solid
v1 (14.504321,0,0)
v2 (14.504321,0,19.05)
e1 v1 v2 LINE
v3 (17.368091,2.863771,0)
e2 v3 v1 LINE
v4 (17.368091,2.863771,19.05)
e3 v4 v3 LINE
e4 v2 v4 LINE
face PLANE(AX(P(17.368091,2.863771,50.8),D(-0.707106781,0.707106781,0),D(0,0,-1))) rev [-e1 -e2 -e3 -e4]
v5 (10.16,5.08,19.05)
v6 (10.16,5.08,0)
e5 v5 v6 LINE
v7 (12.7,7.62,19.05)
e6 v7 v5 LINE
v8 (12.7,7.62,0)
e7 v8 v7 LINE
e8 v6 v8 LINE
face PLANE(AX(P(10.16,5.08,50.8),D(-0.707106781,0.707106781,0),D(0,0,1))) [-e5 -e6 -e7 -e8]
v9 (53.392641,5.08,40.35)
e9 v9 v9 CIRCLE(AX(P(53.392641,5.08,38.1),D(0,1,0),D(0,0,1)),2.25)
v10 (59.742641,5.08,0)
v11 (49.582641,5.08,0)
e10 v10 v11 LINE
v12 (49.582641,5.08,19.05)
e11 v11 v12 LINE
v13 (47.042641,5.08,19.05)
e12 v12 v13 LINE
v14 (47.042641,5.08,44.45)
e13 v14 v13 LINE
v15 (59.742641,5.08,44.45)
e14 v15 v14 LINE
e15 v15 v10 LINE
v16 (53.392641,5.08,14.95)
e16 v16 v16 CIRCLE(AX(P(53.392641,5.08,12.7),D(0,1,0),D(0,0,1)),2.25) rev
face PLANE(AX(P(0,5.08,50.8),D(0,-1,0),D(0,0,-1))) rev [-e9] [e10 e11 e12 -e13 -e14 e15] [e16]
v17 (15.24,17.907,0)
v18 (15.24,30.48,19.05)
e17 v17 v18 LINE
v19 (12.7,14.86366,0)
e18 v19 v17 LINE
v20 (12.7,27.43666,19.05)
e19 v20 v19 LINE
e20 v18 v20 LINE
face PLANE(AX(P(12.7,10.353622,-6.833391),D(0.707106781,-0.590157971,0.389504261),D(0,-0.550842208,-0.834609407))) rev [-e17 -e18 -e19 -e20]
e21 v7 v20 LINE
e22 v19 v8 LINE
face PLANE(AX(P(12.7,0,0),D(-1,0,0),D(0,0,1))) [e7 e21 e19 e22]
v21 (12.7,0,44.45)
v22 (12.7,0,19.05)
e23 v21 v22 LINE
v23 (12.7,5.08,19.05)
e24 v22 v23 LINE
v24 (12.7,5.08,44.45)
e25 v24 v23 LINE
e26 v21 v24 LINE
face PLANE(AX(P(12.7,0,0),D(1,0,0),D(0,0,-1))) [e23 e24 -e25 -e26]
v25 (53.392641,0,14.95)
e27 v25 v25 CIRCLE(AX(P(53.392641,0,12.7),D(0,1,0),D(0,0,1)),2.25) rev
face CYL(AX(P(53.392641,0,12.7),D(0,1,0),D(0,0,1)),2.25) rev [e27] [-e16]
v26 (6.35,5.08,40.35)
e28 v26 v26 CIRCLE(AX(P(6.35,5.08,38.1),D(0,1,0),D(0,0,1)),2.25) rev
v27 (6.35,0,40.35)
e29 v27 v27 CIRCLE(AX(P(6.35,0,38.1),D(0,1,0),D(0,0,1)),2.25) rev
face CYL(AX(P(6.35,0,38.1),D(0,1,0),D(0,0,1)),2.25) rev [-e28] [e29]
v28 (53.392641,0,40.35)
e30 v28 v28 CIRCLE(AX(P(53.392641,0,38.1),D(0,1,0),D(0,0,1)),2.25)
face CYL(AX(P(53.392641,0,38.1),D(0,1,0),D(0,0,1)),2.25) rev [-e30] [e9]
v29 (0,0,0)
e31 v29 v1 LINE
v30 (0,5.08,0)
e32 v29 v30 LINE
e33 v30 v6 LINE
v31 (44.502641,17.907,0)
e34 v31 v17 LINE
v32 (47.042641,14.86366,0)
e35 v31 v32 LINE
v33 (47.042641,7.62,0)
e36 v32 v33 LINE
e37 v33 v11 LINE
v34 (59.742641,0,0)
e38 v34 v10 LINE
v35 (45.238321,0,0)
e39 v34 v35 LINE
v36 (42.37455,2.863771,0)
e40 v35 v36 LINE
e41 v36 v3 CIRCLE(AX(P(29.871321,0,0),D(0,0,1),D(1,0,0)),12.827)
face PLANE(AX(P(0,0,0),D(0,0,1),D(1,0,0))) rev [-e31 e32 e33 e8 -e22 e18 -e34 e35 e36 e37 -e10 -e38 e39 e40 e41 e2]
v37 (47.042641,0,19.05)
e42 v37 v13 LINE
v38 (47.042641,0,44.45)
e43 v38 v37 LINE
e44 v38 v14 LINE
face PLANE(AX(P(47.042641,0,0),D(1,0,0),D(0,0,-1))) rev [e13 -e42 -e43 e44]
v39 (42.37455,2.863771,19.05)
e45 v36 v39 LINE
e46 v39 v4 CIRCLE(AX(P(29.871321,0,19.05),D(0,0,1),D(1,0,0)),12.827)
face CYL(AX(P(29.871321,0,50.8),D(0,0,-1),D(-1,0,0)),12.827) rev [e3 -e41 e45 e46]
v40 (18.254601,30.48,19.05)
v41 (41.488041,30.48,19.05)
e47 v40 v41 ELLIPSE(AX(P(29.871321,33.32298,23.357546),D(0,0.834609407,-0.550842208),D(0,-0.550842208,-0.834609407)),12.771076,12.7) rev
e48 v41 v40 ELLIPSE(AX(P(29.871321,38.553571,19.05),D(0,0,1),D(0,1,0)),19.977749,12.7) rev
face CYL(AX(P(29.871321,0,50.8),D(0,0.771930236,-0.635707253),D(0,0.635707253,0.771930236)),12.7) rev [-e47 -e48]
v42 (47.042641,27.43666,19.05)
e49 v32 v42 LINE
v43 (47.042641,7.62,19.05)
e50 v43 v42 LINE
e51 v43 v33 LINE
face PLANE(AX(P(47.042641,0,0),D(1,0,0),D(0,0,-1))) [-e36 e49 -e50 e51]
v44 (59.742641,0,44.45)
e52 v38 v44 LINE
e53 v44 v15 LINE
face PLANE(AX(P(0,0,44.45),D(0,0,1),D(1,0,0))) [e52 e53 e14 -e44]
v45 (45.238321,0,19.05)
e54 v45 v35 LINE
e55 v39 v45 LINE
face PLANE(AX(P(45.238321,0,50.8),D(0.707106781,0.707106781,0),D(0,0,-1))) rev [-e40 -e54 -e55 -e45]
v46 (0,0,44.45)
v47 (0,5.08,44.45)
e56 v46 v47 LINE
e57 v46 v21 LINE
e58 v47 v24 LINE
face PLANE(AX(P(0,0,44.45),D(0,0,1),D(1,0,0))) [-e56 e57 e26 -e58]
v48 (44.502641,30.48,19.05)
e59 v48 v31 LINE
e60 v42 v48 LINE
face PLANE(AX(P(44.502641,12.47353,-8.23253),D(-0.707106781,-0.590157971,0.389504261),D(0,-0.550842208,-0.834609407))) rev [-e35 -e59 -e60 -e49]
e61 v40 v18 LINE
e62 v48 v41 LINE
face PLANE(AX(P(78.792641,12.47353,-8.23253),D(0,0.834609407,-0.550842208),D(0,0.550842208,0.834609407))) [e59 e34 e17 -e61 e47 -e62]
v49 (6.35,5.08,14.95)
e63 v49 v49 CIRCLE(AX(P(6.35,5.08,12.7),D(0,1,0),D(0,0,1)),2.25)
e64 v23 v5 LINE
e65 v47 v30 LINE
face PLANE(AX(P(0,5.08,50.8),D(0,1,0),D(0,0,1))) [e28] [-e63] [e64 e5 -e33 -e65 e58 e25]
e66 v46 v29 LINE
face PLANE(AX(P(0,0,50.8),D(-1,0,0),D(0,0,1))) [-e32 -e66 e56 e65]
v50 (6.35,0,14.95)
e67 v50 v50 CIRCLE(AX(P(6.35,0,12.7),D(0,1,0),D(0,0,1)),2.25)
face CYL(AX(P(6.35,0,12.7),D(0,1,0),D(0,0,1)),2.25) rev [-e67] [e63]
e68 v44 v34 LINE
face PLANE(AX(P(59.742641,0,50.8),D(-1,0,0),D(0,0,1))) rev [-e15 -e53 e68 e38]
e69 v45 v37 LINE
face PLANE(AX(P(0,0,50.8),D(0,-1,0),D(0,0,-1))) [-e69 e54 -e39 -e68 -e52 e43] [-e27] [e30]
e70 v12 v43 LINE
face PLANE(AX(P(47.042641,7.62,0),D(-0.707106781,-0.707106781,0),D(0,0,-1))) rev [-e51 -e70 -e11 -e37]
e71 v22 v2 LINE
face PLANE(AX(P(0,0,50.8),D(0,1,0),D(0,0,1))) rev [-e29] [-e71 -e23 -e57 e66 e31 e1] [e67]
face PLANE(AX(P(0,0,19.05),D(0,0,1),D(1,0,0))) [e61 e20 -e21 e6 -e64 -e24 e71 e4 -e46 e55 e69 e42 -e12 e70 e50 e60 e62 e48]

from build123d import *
from build123d.topology import SkipClean

# Parameters (mm, degrees)
BOSS_EXTRUDE1_DEPTH     = 50.8
SKETCH2_R               = 2.25
SKETCH2_R_2             = 2.2500000000000004
SKETCH2_R_3             = 2.2499999999999964
SKETCH2_R_4             = 2.250000000000002
CUT_EXTRUDE2_DEPTH      = 80.4629164554471
CUT_EXTRUDE4_DEPTH      = 80.4629164554471
CUT_EXTRUDE4_DEPTH_BACK = 80.4629164554471
SKETCH7_W               = 34.34264107490862
SKETCH7_H               = 6.349999999999994
SKETCH7_H_2             = 25.4
SKETCH7_W_2             = 12.699999999999996
BOSS_EXTRUDE3_START     = 12.7
BOSS_EXTRUDE3_DEPTH     = 34.342641075
CUT_EXTRUDE5_DEPTH      = 81.46127057538526
CUT_EXTRUDE5_DEPTH_BACK = 81.46127057538526
CAVITY1_START           = -12.110223167
CAVITY1_DEPTH           = 25.933177896
CHAMFER5_SIZE           = 2.54


with BuildPart() as part:
    # Sketch1 → Boss-Extrude1 (new body)
    with BuildSketch(Plane.XY):
        with BuildLine():
            Line((0, 5.08), (0, 0))
            Line((0, 0), (11.964320537454306, 0))
            ThreePointArc((11.964320537454306, 2.19e-15), (12.149194735731278, 2.56649684743677), (12.700000000000003, 5.080000000000005))
            Line((12.7, 5.08), (0, 5.08))
        make_face()
        with BuildLine():
            ThreePointArc((12.700000000000003, 5.080000000000005), (12.149194735731278, 2.56649684743677), (11.964320537454306, 2.19e-15))
            Line((11.964320537454306, 0), (17.044320537454304, 0))
            ThreePointArc((17.044320537454304, 1.57e-15), (20.80126185517433, 9.070058682279722), (29.871320537453954, 12.827000000000004))
            Line((29.871320537454306, 12.827000000000004), (29.871320537454306, 17.907))
            ThreePointArc((29.871320537454306, 17.907), (19.154672530731307, 14.34622265615587), (12.700000000000003, 5.080000000000005))
        make_face()
        with BuildLine():
            Line((42.69832053745431, 0), (47.778320537454306, 0))
            ThreePointArc((47.778320537454306, 0), (47.59344633917733, 2.56649684743677), (47.042641074908616, 5.079999999999999))
            ThreePointArc((47.042641074908616, 5.079999999999999), (40.5879685441773, 14.34622265615587), (29.871320537454306, 17.907))
            Line((29.871320537454306, 17.907), (29.871320537454306, 12.827000000000004))
            ThreePointArc((29.871320537453954, 12.827000000000004), (38.94137921973403, 9.070058682279972), (42.69832053745431, 0))
        make_face()
        with BuildLine():
            ThreePointArc((47.042641074908616, 5.079999999999999), (47.59344633917733, 2.56649684743677), (47.778320537454306, 0))
            Line((47.778320537454306, 0), (59.74264107490861, 0))
            Line((59.74264107490861, 0), (59.74264107490861, 5.08))
            Line((59.74264107490861, 5.08), (47.042641074908616, 5.08))
        make_face()
    extrude(amount=BOSS_EXTRUDE1_DEPTH)

    # Sketch2 → Cut-Extrude2 (cut, through all)
    with BuildSketch(Plane(origin=(0, 5.08, 0), x_dir=(1, 0, 0), z_dir=(0, 1, 0))):
        with Locations(Location((6.349999999999999, -12.7, 0), (0, 0, 270))):
            Circle(SKETCH2_R)
        with Locations(Location((6.350000000000002, -38.10000000000001, 0), (0, 0, 270))):
            Circle(SKETCH2_R_2)
        with Locations(Location((53.392641074908624, -38.1, 0), (0, 0, 270))):
            Circle(SKETCH2_R_3)
        with Locations(Location((53.39264107490862, -12.699999999999994, 0), (0, 0, 270))):
            Circle(SKETCH2_R_4)
    extrude(amount=-CUT_EXTRUDE2_DEPTH, mode=Mode.SUBTRACT)

    # Sketch7 → Cut-Extrude4 (cut, two sides: drawn at the far end of the back side and taken through both)
    with BuildSketch(Plane(origin=(0, 5.08, 0), x_dir=(1, 0, 0), z_dir=(0, 1, 0)).offset(-CUT_EXTRUDE4_DEPTH_BACK)):
        Polygon((0, -50.8), (12.700000000000001, -50.8), (12.7, -44.449999999999996), (0, -44.449999999999996), align=None)
        with Locations((29.871320537454306, -47.62499999999999)):
            Rectangle(SKETCH7_W, SKETCH7_H)
        with Locations((29.871320537454306, -31.749999999999996)):
            Rectangle(SKETCH7_W, SKETCH7_H_2)
        with Locations((53.39264107490861, -47.62499999999999)):
            Rectangle(SKETCH7_W_2, SKETCH7_H)
    extrude(amount=CUT_EXTRUDE4_DEPTH + CUT_EXTRUDE4_DEPTH_BACK, mode=Mode.SUBTRACT)

    # Sketch8 → Boss-Extrude3 (add)
    with BuildSketch(Plane(origin=(0, 0, 0), x_dir=(0, 0, -1), z_dir=(1, 0, 0)).offset(BOSS_EXTRUDE3_START)):
        Polygon((-19.049999999999997, 5.0799999999999965), (-19.049999999999994, 30.479999999999997), (0, 17.907), (0, 5.079999999999999), align=None)
    extrude(amount=BOSS_EXTRUDE3_DEPTH)

    # Sketch1<4> → Cut-Extrude5 (cut, two sides: drawn at the far end of the back side and taken through both)
    with SkipClean():  # the faces are left unmerged after this step: merging them gives an invalid solid
        with BuildSketch(Plane.XY.offset(-CUT_EXTRUDE5_DEPTH_BACK)):
            with BuildLine():
                ThreePointArc((29.871320537453954, 12.827000000000004), (20.80126185517433, 9.070058682279722), (17.044320537454304, 1.57e-15))
                Line((17.044320537454304, 0), (29.871320537454306, 0))
                Line((29.871320537454306, 0), (29.871320537454306, 12.827000000000004))
            make_face()
            with BuildLine():
                Line((29.871320537454306, 0), (17.044320537454304, 0))
                ThreePointArc((17.044320537454304, 1.57e-15), (29.871320537454302, -12.827000000000004), (42.69832053745431, -3.14e-15))
                ThreePointArc((42.69832053745431, 0), (38.94137921973403, 9.070058682279972), (29.871320537453954, 12.827000000000004))
                Line((29.871320537454306, 12.827000000000004), (29.871320537454306, 0))
            make_face()
        extrude(amount=CUT_EXTRUDE5_DEPTH + CUT_EXTRUDE5_DEPTH_BACK, mode=Mode.SUBTRACT)

    # Cavity1: read off the stored shape, not the designer's step
    # Cavity1 outline → Cavity1 (cut)
    with SkipClean():  # the faces are left unmerged after this step: merging them gives an invalid solid
        with BuildSketch(Plane(origin=(0, 0, 0), x_dir=(1, 0, 0), z_dir=(0, 0.7719302356170498, -0.6357072528610997)).offset(CAVITY1_START)):
            with BuildLine():
                Line((42.335603858, -36), (41.488040544, -34.081628056))
                ThreePointArc((41.488040544, -34.081628056), (29.871320538, -26.514055969), (18.254600531, -34.081628056))
                Line((18.254600531, -34.081628056), (17.407037217, -36))
                Line((17.407037217, -36), (42.335603858, -36))
            make_face()
        extrude(amount=CAVITY1_DEPTH, mode=Mode.SUBTRACT)

    # Chamfer5
    # the kernel refuses this chamfer: 2.54 mm, written as the material it adds along each edge
    with BuildSketch(Plane(origin=(12.700000000000003, 5.080000000000004, 0), x_dir=(-1, -1.4e-15, 0), z_dir=(0, 0, 1))) as chamfer5_piece_1:
        Polygon((CHAMFER5_SIZE, 0), (0, -CHAMFER5_SIZE), (0, 0), align=None)
    extrude(amount=19.049999999999997)
    with BuildSketch(Plane(origin=(47.042641074908616, 5.08, 0), x_dir=(3.598031758927257e-11, 1.0, 0), z_dir=(0, 0, 1))) as chamfer5_piece_2:
        Polygon((CHAMFER5_SIZE, 0), (9.139001e-11, -CHAMFER5_SIZE), (0, 0), align=None)
    extrude(amount=19.049999999999997)
    # the kernel refuses this chamfer: 2.54 mm, written as the material it takes off along each edge
    with BuildSketch(Plane(origin=(42.69832053745431, -1.3e-16, -7.4053740903902145), x_dir=(1, 5e-17, 0), z_dir=(0, 0, 1))) as chamfer5_2_piece_1:
        with BuildLine():
            Line((CHAMFER5_SIZE, 0), (-0.3237705210766462, 2.863770521075717))
            ThreePointArc((-0.3237705210766462, 2.863770521075717), (-0.08576469637885246, 1.4808281256642715), (0, 0))
            Line((0, 0), (CHAMFER5_SIZE, 0))
        make_face()
    extrude(amount=33.860748180780426, mode=Mode.SUBTRACT)
    with BuildSketch(Plane(origin=(17.044320537454304, 7.9e-16, -7.405374090390225), x_dir=(0.11234172985080312, 0.9936696310817439, 0), z_dir=(0, 0, 1))) as chamfer5_2_piece_2:
        with BuildLine():
            Line((2.882014737592532, 1e-17), (-CHAMFER5_SIZE * 0.112341729851, CHAMFER5_SIZE * 0.993669631082))
            Line((-CHAMFER5_SIZE * 0.112341729851, CHAMFER5_SIZE * 0.993669631082), (0, 0))
            ThreePointArc((0, 0), (1.4810888916756169, 0.0811370190382275), (2.882014737592532, 1e-17))
        make_face()
    extrude(amount=33.86074818078045, mode=Mode.SUBTRACT)
    with BuildSketch(Plane(origin=(47.042641075000006, 34.07814250199304, 24.501731063625822), x_dir=(-1, 6.4e-16, -4.2e-16), z_dir=(0, -0.5508422083307387, -0.8346094065617252))) as chamfer5_2_piece_3:
        Polygon((CHAMFER5_SIZE, 0), (-1.96e-15, -CHAMFER5_SIZE), (0, 0), align=None)
    extrude(amount=35.889197859210064, mode=Mode.SUBTRACT)
    with BuildSketch(Plane(origin=(12.7, 34.07814250199304, 24.50173106362582), x_dir=(0, -0.8346094065617252, 0.5508422083307387), z_dir=(0, -0.5508422083307387, -0.8346094065617252))) as chamfer5_2_piece_4:
        Polygon((CHAMFER5_SIZE, 0), (0, -CHAMFER5_SIZE), (0, 0), align=None)
    extrude(amount=35.88919785921006, mode=Mode.SUBTRACT)


solid = part.part
